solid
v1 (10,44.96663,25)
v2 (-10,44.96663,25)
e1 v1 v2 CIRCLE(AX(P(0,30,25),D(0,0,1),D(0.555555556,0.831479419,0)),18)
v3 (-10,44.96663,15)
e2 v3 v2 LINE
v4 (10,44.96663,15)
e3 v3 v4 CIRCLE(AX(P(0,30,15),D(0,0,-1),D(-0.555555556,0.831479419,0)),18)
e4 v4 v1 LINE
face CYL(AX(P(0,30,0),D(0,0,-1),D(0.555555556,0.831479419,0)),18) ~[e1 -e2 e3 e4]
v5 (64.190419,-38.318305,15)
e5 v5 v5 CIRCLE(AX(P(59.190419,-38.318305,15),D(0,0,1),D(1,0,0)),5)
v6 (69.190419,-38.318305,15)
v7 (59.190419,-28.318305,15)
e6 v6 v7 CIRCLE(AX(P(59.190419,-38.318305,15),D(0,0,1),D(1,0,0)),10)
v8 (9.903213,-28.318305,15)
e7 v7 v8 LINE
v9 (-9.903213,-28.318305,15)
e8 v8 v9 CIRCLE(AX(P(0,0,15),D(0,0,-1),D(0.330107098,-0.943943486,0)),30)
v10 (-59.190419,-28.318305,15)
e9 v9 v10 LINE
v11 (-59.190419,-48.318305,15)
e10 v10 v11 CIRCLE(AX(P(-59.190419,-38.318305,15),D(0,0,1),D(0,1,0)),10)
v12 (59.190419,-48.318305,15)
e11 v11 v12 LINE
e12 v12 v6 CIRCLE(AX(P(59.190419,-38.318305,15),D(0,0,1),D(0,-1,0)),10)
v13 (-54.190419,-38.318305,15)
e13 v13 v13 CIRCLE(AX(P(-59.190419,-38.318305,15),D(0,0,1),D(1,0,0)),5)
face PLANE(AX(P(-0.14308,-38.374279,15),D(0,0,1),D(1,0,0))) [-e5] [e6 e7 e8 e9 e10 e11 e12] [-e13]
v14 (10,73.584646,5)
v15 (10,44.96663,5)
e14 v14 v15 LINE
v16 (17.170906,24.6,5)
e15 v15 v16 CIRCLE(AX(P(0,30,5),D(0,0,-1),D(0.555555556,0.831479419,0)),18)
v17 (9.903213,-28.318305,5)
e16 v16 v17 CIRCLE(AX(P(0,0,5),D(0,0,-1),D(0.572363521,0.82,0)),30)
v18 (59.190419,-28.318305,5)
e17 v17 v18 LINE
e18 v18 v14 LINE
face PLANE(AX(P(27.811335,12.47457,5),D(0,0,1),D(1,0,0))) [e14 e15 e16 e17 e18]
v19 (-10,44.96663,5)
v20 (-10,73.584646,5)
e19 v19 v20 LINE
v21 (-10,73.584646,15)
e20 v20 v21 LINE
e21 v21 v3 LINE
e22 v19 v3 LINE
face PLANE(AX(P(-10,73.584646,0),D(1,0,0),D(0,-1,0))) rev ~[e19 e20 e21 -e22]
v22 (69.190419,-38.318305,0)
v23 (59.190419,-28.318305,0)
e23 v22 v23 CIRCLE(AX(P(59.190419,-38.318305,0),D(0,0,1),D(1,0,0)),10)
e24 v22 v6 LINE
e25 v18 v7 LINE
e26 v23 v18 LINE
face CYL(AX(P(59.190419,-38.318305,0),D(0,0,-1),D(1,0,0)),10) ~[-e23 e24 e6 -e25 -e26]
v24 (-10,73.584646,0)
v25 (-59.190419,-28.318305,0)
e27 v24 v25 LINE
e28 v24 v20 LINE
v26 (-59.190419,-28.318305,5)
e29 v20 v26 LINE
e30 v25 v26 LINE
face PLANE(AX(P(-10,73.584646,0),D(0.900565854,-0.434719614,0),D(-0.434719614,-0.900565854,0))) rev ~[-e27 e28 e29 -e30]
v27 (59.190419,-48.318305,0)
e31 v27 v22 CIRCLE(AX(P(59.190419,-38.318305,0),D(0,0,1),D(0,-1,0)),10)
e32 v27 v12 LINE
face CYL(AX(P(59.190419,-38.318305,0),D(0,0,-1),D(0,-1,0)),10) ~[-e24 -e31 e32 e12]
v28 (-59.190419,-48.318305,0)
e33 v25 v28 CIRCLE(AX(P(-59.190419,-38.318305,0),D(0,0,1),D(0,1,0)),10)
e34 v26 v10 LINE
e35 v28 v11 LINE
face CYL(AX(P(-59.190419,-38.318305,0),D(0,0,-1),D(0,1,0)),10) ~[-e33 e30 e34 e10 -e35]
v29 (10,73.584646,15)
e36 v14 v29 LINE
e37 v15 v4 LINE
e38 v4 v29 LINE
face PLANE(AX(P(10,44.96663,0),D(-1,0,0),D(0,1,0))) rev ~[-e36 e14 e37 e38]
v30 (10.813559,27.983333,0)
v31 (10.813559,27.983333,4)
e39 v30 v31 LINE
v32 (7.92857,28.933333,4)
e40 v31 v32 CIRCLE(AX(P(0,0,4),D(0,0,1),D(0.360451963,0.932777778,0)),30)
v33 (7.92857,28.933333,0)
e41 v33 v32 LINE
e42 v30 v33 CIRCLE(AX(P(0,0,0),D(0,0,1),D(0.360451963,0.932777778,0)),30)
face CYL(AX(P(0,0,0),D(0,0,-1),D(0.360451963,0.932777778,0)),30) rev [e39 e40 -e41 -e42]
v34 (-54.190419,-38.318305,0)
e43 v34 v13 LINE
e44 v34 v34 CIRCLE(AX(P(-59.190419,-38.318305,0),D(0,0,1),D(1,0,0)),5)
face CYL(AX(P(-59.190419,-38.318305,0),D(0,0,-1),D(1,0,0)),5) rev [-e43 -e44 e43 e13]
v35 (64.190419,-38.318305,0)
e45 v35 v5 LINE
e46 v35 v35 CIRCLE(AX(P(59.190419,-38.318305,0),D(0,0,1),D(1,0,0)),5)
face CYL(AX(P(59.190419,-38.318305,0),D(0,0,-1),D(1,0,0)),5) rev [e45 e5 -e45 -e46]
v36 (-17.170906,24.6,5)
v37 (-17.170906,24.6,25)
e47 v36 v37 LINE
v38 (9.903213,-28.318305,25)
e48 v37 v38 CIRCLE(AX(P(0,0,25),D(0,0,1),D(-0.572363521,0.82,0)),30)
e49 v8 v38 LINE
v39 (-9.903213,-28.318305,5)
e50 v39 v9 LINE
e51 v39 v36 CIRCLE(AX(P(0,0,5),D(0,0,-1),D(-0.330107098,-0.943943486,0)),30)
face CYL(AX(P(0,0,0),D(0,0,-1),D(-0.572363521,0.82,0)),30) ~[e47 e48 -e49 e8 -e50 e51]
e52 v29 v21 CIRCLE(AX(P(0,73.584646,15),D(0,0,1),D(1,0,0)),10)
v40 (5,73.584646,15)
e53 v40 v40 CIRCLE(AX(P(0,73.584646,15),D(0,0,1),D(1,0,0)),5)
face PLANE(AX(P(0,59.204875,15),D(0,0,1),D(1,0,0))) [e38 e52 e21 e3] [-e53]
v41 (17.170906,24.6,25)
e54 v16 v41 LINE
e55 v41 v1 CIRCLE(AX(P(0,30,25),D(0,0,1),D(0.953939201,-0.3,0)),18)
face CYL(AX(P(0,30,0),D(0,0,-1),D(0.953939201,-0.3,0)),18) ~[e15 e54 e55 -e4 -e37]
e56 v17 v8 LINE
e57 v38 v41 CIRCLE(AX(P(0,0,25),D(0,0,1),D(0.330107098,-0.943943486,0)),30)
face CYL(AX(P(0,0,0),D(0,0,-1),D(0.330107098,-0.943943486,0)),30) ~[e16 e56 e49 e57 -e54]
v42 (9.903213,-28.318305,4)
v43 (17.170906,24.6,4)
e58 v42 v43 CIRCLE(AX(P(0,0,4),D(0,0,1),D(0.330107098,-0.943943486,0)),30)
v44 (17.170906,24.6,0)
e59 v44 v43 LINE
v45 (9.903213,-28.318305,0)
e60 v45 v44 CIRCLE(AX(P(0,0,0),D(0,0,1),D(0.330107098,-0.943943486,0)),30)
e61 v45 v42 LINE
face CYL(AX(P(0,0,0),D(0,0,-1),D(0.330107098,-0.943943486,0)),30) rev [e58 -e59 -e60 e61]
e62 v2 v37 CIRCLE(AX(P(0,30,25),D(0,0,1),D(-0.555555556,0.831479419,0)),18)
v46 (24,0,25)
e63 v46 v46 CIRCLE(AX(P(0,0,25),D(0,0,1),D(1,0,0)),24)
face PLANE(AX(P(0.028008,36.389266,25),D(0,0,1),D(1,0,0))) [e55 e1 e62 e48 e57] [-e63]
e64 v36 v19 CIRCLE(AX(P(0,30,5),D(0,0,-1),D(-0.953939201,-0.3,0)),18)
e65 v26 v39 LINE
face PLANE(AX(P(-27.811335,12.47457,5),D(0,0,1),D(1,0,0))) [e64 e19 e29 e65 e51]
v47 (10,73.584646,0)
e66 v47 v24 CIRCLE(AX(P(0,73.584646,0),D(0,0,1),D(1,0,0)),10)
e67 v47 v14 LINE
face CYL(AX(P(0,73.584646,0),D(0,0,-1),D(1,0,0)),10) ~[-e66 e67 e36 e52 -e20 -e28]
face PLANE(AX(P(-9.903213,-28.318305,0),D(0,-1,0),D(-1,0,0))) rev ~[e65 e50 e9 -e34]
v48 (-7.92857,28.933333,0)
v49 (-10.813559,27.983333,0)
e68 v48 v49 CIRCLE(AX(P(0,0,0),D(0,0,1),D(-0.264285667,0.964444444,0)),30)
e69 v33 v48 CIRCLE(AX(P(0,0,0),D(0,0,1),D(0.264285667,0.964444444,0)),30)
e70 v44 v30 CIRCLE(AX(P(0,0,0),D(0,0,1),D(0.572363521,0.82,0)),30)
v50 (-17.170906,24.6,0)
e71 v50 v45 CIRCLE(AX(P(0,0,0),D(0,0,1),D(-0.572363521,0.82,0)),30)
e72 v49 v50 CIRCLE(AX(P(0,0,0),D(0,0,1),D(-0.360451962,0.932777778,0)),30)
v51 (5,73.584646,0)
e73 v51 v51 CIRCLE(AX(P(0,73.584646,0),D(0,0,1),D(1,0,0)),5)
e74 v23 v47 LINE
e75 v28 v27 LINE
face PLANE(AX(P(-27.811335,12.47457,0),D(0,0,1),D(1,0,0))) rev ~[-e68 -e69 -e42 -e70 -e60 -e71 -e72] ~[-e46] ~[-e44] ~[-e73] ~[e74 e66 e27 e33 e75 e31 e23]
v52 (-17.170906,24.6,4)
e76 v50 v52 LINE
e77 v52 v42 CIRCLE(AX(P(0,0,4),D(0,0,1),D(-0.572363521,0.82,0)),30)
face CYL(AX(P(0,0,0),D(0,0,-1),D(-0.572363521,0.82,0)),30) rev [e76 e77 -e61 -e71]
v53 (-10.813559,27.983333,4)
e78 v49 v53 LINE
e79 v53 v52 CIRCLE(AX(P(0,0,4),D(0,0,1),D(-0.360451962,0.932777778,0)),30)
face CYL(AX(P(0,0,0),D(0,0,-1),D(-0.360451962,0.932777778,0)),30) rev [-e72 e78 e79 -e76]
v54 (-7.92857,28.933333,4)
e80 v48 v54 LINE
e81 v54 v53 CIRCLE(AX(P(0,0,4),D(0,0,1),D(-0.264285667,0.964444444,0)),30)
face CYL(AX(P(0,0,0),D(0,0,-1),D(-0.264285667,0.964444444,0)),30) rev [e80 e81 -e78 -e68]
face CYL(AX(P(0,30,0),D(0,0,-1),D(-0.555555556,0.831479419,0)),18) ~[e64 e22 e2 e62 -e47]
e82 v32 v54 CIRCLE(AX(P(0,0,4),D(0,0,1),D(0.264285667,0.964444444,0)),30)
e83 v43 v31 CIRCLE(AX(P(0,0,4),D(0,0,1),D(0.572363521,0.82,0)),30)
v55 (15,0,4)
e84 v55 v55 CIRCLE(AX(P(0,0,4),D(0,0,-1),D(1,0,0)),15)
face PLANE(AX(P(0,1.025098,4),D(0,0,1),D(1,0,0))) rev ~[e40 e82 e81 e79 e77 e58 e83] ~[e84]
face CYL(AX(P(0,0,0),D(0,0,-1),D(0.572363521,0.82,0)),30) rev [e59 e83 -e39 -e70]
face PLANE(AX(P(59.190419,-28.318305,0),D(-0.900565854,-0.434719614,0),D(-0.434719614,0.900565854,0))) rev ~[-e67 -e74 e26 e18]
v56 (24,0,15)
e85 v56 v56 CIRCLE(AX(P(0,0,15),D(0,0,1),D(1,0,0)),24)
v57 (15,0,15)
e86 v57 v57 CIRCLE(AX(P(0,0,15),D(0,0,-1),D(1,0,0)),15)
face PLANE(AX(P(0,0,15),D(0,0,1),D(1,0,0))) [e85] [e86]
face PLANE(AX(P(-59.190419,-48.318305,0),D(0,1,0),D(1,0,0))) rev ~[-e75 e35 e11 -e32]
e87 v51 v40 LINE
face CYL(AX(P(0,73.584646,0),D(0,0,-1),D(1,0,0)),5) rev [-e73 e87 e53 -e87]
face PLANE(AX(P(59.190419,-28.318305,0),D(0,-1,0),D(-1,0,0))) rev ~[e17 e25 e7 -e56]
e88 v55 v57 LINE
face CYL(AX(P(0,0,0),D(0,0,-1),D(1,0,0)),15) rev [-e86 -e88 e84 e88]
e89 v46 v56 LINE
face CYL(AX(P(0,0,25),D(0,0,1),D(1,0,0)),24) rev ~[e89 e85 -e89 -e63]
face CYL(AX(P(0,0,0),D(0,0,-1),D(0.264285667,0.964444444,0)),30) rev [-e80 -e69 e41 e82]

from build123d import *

# Parameters (mm, degrees)
F0_R     = 18
F0_R_2   = 15
F1_DEPTH = 25
F0_R_3   = 5
F2_DEPTH = 15
F3_DEPTH = 5
F4_R     = 24
F5_DEPTH = 10
F6_R     = 18
F7_DEPTH = 4
F8_DEPTH = 25


# Not quite as in the source:
# - a feature of the source that left no trace in its solid (it failed there, or was rolled back) is left out


with BuildPart() as f1:
    # F0 (on Top) → F1 (new body)
    with BuildSketch(Plane.XY):
        with BuildLine():
            ThreePointArc((11, 30), (10.9532905474, 28.9873667079), (10.8135588756, 27.9833333333))
            ThreePointArc((10.8135588756, 27.9833333333), (14.0941228696, 26.4831210498), (17.1709056255, 24.6))
            ThreePointArc((17.1709056255, 24.6), (16.9783517429, 35.9779237278), (10, 44.9666295471))
            ThreePointArc((10, 44.9666295471), (0, 48), (-10, 44.9666295471))
            ThreePointArc((-10, 44.9666295471), (-16.9783517429, 35.9779237278), (-17.1709056255, 24.6))
            ThreePointArc((-17.1709056255, 24.6), (-14.0941228696, 26.4831210498), (-10.8135588756, 27.9833333333))
            ThreePointArc((-10.8135588756, 27.9833333333), (-1.0126332921, 40.9532905474), (11, 30))
        make_face()
        with BuildLine():
            ThreePointArc((-7.9285699986, 28.9333333333), (0, 30), (7.9285699986, 28.9333333333))
            ThreePointArc((7.9285699986, 28.9333333333), (7.9821225244, 29.4654721656), (8, 30))
            ThreePointArc((8, 30), (-0.5345278344, 37.9821225244), (-7.9285699986, 28.9333333333))
        make_face()
        with BuildLine():
            ThreePointArc((7.9285699986, 28.9333333333), (9.3830951015, 28.4948684208), (10.8135588756, 27.9833333333))
            ThreePointArc((10.8135588756, 27.9833333333), (10.9532905474, 28.9873667079), (11, 30))
            ThreePointArc((11, 30), (-1.0126332921, 40.9532905474), (-10.8135588756, 27.9833333333))
            ThreePointArc((-10.8135588756, 27.9833333333), (-9.3830951015, 28.4948684208), (-7.9285699986, 28.9333333333))
            ThreePointArc((-7.9285699986, 28.9333333333), (-0.5345278344, 37.9821225244), (8, 30))
            ThreePointArc((8, 30), (7.9821225244, 29.4654721656), (7.9285699986, 28.9333333333))
        make_face()
        with BuildLine():
            ThreePointArc((8.1236109924, 22.5833333333), (19.6337294447, 13.8027775499), (24, 0))
            ThreePointArc((24, 0), (-13.8027775499, -19.6337294447), (-8.1236109924, 22.5833333333))
            ThreePointArc((-8.1236109924, 22.5833333333), (-9.8460195334, 25.0953186293), (-10.8135588756, 27.9833333333))
            ThreePointArc((-10.8135588756, 27.9833333333), (-14.0941228696, 26.4831210498), (-17.1709056255, 24.6))
            ThreePointArc((-17.1709056255, 24.6), (-29.7210146782, -4.0818239184), (-9.9032129289, -28.3183045694))
            ThreePointArc((-9.9032129289, -28.3183045694), (0, -30), (9.9032129289, -28.3183045694))
            ThreePointArc((9.9032129289, -28.3183045694), (24.4652446122, -17.3623675248), (30, 0))
            ThreePointArc((30, 0), (26.6000673755, 13.8721453142), (17.1709056255, 24.6))
            ThreePointArc((17.1709056255, 24.6), (14.0941228696, 26.4831210498), (10.8135588756, 27.9833333333))
            ThreePointArc((10.8135588756, 27.9833333333), (9.8460195334, 25.0953186293), (8.1236109924, 22.5833333333))
        make_face()
        with BuildLine():
            ThreePointArc((-8.1236109924, 22.5833333333), (-13.8027775499, -19.6337294447), (24, 0))
            ThreePointArc((24, 0), (19.6337294447, 13.8027775499), (8.1236109924, 22.5833333333))
            ThreePointArc((8.1236109924, 22.5833333333), (0, 19), (-8.1236109924, 22.5833333333))
        make_face()
        Circle(F0_R, mode=Mode.SUBTRACT)
        Circle(F0_R)
        Circle(F0_R_2, mode=Mode.SUBTRACT)
        Circle(F0_R_2)
        with BuildLine():
            ThreePointArc((-8.1236109924, 22.5833333333), (0, 19), (8.1236109924, 22.5833333333))
            ThreePointArc((8.1236109924, 22.5833333333), (6.4342628666, 23.1214242936), (4.7098006563, 23.5333333333))
            ThreePointArc((4.7098006563, 23.5333333333), (0, 22), (-4.7098006563, 23.5333333333))
            ThreePointArc((-4.7098006563, 23.5333333333), (-6.4342628666, 23.1214242936), (-8.1236109924, 22.5833333333))
        make_face()
        with BuildLine():
            ThreePointArc((4.7098006563, 23.5333333333), (6.4342628666, 23.1214242936), (8.1236109924, 22.5833333333))
            ThreePointArc((8.1236109924, 22.5833333333), (9.8460195334, 25.0953186293), (10.8135588756, 27.9833333333))
            ThreePointArc((10.8135588756, 27.9833333333), (9.3830951015, 28.4948684208), (7.9285699986, 28.9333333333))
            ThreePointArc((7.9285699986, 28.9333333333), (6.8718340494, 25.9039168957), (4.7098006563, 23.5333333333))
        make_face()
        with BuildLine():
            ThreePointArc((-10.8135588756, 27.9833333333), (-9.8460195334, 25.0953186293), (-8.1236109924, 22.5833333333))
            ThreePointArc((-8.1236109924, 22.5833333333), (-6.4342628666, 23.1214242936), (-4.7098006563, 23.5333333333))
            ThreePointArc((-4.7098006563, 23.5333333333), (-6.8718340494, 25.9039168957), (-7.9285699986, 28.9333333333))
            ThreePointArc((-7.9285699986, 28.9333333333), (-9.3830951015, 28.4948684208), (-10.8135588756, 27.9833333333))
        make_face()
        with BuildLine():
            ThreePointArc((-4.7098006563, 23.5333333333), (0, 24), (4.7098006563, 23.5333333333))
            ThreePointArc((4.7098006563, 23.5333333333), (6.8718340494, 25.9039168957), (7.9285699986, 28.9333333333))
            ThreePointArc((7.9285699986, 28.9333333333), (0, 30), (-7.9285699986, 28.9333333333))
            ThreePointArc((-7.9285699986, 28.9333333333), (-6.8718340494, 25.9039168957), (-4.7098006563, 23.5333333333))
        make_face()
        with BuildLine():
            ThreePointArc((-4.7098006563, 23.5333333333), (0, 22), (4.7098006563, 23.5333333333))
            ThreePointArc((4.7098006563, 23.5333333333), (0, 24), (-4.7098006563, 23.5333333333))
        make_face()
    extrude(amount=F1_DEPTH)

    # F0 (on Top) → F2 (join)
    with BuildSketch(Plane.XY):
        with BuildLine():
            ThreePointArc((9.9032129289, -28.3183045694), (0, -30), (-9.9032129289, -28.3183045694))
            Line((-9.9032129289, -28.3183045694), (-59.1904185712, -28.3183045694))
            ThreePointArc((-59.1904185712, -28.3183045694), (-52.1193507594, -31.2472367575), (-49.1904185712, -38.3183045694))
            ThreePointArc((-49.1904185712, -38.3183045694), (-52.1193507594, -45.3893723813), (-59.1904185712, -48.3183045694))
            Line((-59.1904185712, -48.3183045694), (0, -48.3183045694))
            Line((0, -48.3183045694), (59.1904185712, -48.3183045694))
            ThreePointArc((59.1904185712, -48.3183045694), (49.1904185712, -38.3183045694), (59.1904185712, -28.3183045694))
            Line((59.1904185712, -28.3183045694), (9.9032129289, -28.3183045694))
        make_face()
        with BuildLine():
            ThreePointArc((-49.1904185712, -38.3183045694), (-52.1193507594, -31.2472367575), (-59.1904185712, -28.3183045694))
            ThreePointArc((-59.1904185712, -28.3183045694), (-69.1904185712, -38.3183045694), (-59.1904185712, -48.3183045694))
            ThreePointArc((-59.1904185712, -48.3183045694), (-52.1193507594, -45.3893723813), (-49.1904185712, -38.3183045694))
        make_face()
        with Locations((-59.1904185712, -38.3183045694)):
            Circle(F0_R_3, mode=Mode.SUBTRACT)
        with BuildLine():
            ThreePointArc((69.1904185712, -38.3183045694), (66.2614863831, -31.2472367575), (59.1904185712, -28.3183045694))
            ThreePointArc((59.1904185712, -28.3183045694), (49.1904185712, -38.3183045694), (59.1904185712, -48.3183045694))
            ThreePointArc((59.1904185712, -48.3183045694), (66.2614863831, -45.3893723813), (69.1904185712, -38.3183045694))
        make_face()
        with Locations((59.1904185712, -38.3183045694)):
            Circle(F0_R_3, mode=Mode.SUBTRACT)
        with BuildLine():
            ThreePointArc((-10, 44.9666295471), (0, 48), (10, 44.9666295471))
            Line((10, 44.9666295471), (10, 73.5846459866))
            ThreePointArc((10, 73.5846459866), (0, 63.5846459866), (-10, 73.5846459866))
            Line((-10, 73.5846459866), (-10, 44.9666295471))
        make_face()
        with BuildLine():
            ThreePointArc((-10, 73.5846459866), (0, 63.5846459866), (10, 73.5846459866))
            ThreePointArc((10, 73.5846459866), (0, 83.5846459866), (-10, 73.5846459866))
        make_face()
        with Locations((0, 73.5846459866)):
            Circle(F0_R_3, mode=Mode.SUBTRACT)
    extrude(amount=F2_DEPTH)

    # F0 (on Top) → F3 (join)
    with BuildSketch(Plane.XY):
        with BuildLine():
            ThreePointArc((-9.9032129289, -28.3183045694), (-29.7210146782, -4.0818239184), (-17.1709056255, 24.6))
            ThreePointArc((-17.1709056255, 24.6), (-16.9783517429, 35.9779237278), (-10, 44.9666295471))
            Line((-10, 44.9666295471), (-10, 73.5846459866))
            Line((-10, 73.5846459866), (-59.1904185712, -28.3183045694))
            Line((-59.1904185712, -28.3183045694), (-9.9032129289, -28.3183045694))
        make_face()
        with BuildLine():
            ThreePointArc((10, 44.9666295471), (16.9783517429, 35.9779237278), (17.1709056255, 24.6))
            ThreePointArc((17.1709056255, 24.6), (26.6000673755, 13.8721453142), (30, 0))
            ThreePointArc((30, 0), (24.4652446122, -17.3623675248), (9.9032129289, -28.3183045694))
            Line((9.9032129289, -28.3183045694), (59.1904185712, -28.3183045694))
            Line((59.1904185712, -28.3183045694), (10, 73.5846459866))
            Line((10, 73.5846459866), (10, 44.9666295471))
        make_face()
    extrude(amount=F3_DEPTH)

    # F4 (on face) → F5 (cut)
    with BuildSketch(Plane.XY.offset(25)):
        Circle(F4_R)
    extrude(amount=-F5_DEPTH, mode=Mode.SUBTRACT)

    # F6 (on face) + F0 (on Top) → F7 (cut)
    with BuildSketch(Plane.XY):
        with BuildLine():
            ThreePointArc((10.8135588756, 27.9833333333), (9.8460195334, 25.0953186293), (8.1236109924, 22.5833333333))
            ThreePointArc((8.1236109924, 22.5833333333), (0, -24), (-8.1236109924, 22.5833333333))
            ThreePointArc((-8.1236109924, 22.5833333333), (-9.8460195334, 25.0953186293), (-10.8135588756, 27.9833333333))
            ThreePointArc((-10.8135588756, 27.9833333333), (-14.0941228696, 26.4831210498), (-17.1709056255, 24.6))
            ThreePointArc((-17.1709056255, 24.6), (-29.7210146782, -4.0818239184), (-9.9032129289, -28.3183045694))
            ThreePointArc((-9.9032129289, -28.3183045694), (0, -30), (9.9032129289, -28.3183045694))
            ThreePointArc((9.9032129289, -28.3183045694), (29.7210146782, -4.0818239184), (17.1709056255, 24.6))
            ThreePointArc((17.1709056255, 24.6), (14.0941228696, 26.4831210498), (10.8135588756, 27.9833333333))
        make_face()
        Circle(F6_R)
    with BuildSketch(Plane.XY):
        with BuildLine():
            ThreePointArc((-8.1236109924, 22.5833333333), (-13.8027775499, -19.6337294447), (24, 0))
            ThreePointArc((24, 0), (19.6337294447, 13.8027775499), (8.1236109924, 22.5833333333))
            ThreePointArc((8.1236109924, 22.5833333333), (0, 19), (-8.1236109924, 22.5833333333))
        make_face()
        Circle(F0_R, mode=Mode.SUBTRACT)
        Circle(F0_R)
        Circle(F0_R_2, mode=Mode.SUBTRACT)
        with BuildLine():
            ThreePointArc((-4.7098006563, 23.5333333333), (0, 24), (4.7098006563, 23.5333333333))
            ThreePointArc((4.7098006563, 23.5333333333), (6.8718340494, 25.9039168957), (7.9285699986, 28.9333333333))
            ThreePointArc((7.9285699986, 28.9333333333), (0, 30), (-7.9285699986, 28.9333333333))
            ThreePointArc((-7.9285699986, 28.9333333333), (-6.8718340494, 25.9039168957), (-4.7098006563, 23.5333333333))
        make_face()
        with BuildLine():
            ThreePointArc((-8.1236109924, 22.5833333333), (0, 19), (8.1236109924, 22.5833333333))
            ThreePointArc((8.1236109924, 22.5833333333), (6.4342628666, 23.1214242936), (4.7098006563, 23.5333333333))
            ThreePointArc((4.7098006563, 23.5333333333), (0, 22), (-4.7098006563, 23.5333333333))
            ThreePointArc((-4.7098006563, 23.5333333333), (-6.4342628666, 23.1214242936), (-8.1236109924, 22.5833333333))
        make_face()
        with BuildLine():
            ThreePointArc((-10.8135588756, 27.9833333333), (-9.8460195334, 25.0953186293), (-8.1236109924, 22.5833333333))
            ThreePointArc((-8.1236109924, 22.5833333333), (-6.4342628666, 23.1214242936), (-4.7098006563, 23.5333333333))
            ThreePointArc((-4.7098006563, 23.5333333333), (-6.8718340494, 25.9039168957), (-7.9285699986, 28.9333333333))
            ThreePointArc((-7.9285699986, 28.9333333333), (-9.3830951015, 28.4948684208), (-10.8135588756, 27.9833333333))
        make_face()
        with BuildLine():
            ThreePointArc((4.7098006563, 23.5333333333), (6.4342628666, 23.1214242936), (8.1236109924, 22.5833333333))
            ThreePointArc((8.1236109924, 22.5833333333), (9.8460195334, 25.0953186293), (10.8135588756, 27.9833333333))
            ThreePointArc((10.8135588756, 27.9833333333), (9.3830951015, 28.4948684208), (7.9285699986, 28.9333333333))
            ThreePointArc((7.9285699986, 28.9333333333), (6.8718340494, 25.9039168957), (4.7098006563, 23.5333333333))
        make_face()
        with BuildLine():
            ThreePointArc((-4.7098006563, 23.5333333333), (0, 22), (4.7098006563, 23.5333333333))
            ThreePointArc((4.7098006563, 23.5333333333), (0, 24), (-4.7098006563, 23.5333333333))
        make_face()
    extrude(amount=F7_DEPTH, mode=Mode.SUBTRACT)

    # F0 (on Top) → F8 (cut)
    with BuildSketch(Plane.XY):
        Circle(F0_R_2)
    extrude(amount=F8_DEPTH, mode=Mode.SUBTRACT)


solid = f1.part
